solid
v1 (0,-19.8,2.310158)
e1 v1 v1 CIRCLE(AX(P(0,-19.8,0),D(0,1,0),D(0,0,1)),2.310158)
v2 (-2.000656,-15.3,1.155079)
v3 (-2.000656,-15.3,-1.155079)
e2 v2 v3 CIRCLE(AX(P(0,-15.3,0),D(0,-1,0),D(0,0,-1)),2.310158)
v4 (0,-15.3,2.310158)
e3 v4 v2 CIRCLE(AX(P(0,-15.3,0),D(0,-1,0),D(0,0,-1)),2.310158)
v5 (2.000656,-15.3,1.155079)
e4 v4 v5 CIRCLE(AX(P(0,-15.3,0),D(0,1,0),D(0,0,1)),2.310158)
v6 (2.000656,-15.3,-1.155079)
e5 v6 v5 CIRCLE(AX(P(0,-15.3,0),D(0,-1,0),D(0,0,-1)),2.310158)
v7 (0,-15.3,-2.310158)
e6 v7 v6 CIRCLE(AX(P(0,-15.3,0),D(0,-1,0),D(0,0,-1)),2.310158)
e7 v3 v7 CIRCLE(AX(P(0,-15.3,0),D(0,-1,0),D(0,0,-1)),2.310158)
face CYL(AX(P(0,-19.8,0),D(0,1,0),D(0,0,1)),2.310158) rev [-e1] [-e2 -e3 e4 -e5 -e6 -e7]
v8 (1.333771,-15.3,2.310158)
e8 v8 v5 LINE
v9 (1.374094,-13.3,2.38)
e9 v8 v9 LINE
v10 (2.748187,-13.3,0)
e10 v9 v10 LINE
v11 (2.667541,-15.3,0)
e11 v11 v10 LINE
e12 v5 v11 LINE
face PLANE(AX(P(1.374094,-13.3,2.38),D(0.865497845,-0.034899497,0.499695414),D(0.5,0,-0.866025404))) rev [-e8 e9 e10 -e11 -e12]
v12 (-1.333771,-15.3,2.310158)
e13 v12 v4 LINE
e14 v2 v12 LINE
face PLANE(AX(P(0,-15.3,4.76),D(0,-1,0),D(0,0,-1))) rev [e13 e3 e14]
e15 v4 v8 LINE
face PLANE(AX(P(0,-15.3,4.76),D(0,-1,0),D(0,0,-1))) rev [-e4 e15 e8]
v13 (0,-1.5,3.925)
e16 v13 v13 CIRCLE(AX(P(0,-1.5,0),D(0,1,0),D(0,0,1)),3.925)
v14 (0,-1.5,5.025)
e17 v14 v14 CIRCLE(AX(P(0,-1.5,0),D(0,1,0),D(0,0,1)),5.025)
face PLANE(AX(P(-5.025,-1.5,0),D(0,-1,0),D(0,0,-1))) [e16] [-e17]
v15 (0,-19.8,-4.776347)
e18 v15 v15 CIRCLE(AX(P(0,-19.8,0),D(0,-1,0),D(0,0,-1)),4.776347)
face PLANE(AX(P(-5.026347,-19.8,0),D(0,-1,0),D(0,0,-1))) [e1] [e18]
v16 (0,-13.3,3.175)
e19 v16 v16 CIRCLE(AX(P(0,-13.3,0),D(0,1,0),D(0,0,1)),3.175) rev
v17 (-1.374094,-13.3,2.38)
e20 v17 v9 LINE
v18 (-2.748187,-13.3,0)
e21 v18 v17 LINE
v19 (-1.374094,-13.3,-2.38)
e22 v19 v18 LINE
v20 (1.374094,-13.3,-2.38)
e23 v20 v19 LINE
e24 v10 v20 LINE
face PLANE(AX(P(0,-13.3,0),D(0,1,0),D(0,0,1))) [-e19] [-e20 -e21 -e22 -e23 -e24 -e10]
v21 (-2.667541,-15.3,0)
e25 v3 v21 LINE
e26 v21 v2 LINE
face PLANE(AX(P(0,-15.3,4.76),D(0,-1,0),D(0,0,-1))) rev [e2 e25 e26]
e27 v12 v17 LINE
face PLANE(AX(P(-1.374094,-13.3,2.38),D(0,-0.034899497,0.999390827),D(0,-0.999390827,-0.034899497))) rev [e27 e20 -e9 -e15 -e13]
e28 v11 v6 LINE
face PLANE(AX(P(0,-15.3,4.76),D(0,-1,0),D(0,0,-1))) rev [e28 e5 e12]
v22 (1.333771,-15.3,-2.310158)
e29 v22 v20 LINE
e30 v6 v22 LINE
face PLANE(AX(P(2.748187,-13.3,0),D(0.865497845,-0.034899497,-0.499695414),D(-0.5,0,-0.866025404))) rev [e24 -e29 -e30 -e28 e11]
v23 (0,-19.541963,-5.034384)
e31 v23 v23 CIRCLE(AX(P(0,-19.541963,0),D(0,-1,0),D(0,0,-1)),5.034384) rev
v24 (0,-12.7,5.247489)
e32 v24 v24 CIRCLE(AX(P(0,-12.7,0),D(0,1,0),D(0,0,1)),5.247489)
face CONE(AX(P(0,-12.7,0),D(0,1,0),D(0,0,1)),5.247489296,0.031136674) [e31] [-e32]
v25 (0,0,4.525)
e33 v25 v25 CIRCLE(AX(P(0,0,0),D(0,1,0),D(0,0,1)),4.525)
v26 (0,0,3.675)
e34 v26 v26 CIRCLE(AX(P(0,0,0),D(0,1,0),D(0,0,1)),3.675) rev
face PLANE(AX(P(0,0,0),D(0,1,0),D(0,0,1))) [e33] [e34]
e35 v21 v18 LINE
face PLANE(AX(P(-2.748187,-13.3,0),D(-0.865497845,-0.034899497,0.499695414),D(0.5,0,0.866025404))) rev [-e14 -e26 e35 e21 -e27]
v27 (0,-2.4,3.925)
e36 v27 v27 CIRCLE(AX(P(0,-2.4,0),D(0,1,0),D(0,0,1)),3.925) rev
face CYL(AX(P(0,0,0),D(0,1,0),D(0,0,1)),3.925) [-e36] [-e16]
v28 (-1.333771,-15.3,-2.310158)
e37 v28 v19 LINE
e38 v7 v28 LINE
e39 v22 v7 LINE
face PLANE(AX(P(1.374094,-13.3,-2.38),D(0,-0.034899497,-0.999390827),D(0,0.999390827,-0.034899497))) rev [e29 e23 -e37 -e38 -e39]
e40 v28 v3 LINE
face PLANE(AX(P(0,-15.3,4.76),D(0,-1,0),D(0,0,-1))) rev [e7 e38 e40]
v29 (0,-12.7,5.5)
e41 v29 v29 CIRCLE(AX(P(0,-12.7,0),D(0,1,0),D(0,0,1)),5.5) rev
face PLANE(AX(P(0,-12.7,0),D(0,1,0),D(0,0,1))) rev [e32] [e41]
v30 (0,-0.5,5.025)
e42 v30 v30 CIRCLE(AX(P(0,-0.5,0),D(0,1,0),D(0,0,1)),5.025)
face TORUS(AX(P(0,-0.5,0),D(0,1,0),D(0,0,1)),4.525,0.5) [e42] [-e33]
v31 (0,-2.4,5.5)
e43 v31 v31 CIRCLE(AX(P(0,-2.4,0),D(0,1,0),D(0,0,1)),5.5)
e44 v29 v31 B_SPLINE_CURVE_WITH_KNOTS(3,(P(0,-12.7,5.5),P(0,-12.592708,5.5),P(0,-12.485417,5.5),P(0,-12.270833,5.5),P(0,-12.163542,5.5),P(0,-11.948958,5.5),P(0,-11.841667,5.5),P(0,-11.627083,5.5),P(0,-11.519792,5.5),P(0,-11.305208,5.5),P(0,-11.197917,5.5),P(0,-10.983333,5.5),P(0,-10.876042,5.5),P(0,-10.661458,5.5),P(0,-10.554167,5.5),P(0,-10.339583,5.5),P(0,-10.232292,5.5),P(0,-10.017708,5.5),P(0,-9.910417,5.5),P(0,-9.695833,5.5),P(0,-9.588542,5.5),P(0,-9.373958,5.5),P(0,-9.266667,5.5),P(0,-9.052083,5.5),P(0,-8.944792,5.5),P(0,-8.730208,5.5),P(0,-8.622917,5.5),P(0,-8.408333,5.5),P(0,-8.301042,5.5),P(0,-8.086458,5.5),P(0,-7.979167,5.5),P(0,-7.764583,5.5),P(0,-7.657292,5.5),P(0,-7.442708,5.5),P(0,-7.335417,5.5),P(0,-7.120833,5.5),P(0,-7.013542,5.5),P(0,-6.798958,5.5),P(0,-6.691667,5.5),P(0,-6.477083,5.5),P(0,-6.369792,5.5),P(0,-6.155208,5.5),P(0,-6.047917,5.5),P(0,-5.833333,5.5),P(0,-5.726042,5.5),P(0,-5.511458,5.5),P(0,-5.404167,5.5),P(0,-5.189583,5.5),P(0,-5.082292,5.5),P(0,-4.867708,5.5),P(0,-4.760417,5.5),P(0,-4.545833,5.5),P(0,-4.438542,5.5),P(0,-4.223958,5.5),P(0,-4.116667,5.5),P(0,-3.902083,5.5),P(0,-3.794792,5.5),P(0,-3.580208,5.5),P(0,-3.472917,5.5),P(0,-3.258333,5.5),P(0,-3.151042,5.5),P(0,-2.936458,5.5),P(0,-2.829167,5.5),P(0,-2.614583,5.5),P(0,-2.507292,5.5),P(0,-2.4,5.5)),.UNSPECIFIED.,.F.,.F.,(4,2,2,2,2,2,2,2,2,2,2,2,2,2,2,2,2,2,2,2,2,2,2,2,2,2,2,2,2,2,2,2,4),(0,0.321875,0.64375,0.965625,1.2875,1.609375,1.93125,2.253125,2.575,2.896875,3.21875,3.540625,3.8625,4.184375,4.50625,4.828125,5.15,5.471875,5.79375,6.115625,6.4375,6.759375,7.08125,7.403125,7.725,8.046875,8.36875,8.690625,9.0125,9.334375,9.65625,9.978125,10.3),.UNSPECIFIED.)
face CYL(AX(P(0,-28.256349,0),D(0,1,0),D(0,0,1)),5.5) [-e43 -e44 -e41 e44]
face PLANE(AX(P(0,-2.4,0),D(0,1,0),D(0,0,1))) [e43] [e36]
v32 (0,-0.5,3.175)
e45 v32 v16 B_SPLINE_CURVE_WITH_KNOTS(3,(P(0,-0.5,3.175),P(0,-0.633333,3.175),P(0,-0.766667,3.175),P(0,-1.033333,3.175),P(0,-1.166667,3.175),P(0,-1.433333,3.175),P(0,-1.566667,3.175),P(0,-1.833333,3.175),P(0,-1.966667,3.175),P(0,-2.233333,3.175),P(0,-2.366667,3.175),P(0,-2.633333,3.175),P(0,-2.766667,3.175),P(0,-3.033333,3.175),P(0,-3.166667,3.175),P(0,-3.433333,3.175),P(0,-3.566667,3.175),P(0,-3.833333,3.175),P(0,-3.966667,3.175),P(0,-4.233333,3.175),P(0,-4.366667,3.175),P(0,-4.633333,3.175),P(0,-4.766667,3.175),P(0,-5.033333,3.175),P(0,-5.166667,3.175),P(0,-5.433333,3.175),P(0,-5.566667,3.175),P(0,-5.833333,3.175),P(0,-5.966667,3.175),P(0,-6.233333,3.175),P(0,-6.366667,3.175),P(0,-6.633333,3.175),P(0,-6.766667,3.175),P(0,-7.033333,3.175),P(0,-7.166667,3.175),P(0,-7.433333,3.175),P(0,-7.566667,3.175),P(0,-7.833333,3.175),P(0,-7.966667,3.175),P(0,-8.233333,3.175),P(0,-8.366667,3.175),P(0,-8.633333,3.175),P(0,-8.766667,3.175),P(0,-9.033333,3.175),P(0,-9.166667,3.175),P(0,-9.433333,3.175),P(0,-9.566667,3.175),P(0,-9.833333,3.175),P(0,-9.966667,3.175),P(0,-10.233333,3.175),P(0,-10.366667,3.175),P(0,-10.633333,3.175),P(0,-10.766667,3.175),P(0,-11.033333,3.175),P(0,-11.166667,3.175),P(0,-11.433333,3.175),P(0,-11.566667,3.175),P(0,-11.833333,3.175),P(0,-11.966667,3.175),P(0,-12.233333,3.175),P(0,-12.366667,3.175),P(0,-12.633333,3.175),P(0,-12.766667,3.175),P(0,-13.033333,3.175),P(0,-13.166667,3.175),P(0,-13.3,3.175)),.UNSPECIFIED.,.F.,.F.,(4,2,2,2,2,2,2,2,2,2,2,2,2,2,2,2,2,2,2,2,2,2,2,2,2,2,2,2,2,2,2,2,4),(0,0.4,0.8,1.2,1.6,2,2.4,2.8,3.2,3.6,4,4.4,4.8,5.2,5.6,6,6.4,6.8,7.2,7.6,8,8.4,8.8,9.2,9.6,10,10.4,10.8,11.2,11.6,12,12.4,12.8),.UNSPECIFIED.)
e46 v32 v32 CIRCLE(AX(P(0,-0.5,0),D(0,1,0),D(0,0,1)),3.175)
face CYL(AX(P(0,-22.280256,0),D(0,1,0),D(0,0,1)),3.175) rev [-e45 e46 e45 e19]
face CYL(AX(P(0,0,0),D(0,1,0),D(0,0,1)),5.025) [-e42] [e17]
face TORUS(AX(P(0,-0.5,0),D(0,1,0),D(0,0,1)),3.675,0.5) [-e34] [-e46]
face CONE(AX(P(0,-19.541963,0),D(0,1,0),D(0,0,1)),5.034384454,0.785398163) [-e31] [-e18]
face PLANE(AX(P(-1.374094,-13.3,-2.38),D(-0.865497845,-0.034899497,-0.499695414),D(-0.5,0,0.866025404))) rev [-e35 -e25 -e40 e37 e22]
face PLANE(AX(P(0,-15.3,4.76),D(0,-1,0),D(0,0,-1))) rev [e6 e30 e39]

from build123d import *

# Parameters (mm, degrees)
UBODY_SKETCH_R = 5.5
UBODY_DEPTH    = 10.3
TUBE_START     = -13.3
TUBE_SKETCH_R  = 3.175
TUBE_DEPTH     = 13.3
TUBE_RADIUS_R  = 0.5
HEX_2_DEPTH    = 2
HEX_2_DRAFT    = -2
PORT_SKETCH_R  = 2.310158461
PORT_DEPTH     = 18.163624326


with BuildPart() as part:
    # Release_Sketch → Release (revolve)
    with BuildSketch(Plane.XY, mode=Mode.PRIVATE) as release_sk:
        with BuildLine():
            Line((0, 0), (-4.525, 0))
            ThreePointArc((-4.525, 0), (-4.878553391, -0.146446609), (-5.025, -0.5))
            Line((-5.025, -0.5), (-5.025, -1.5))
            Line((-5.025, -1.5), (-3.925, -1.5))
            Line((-3.925, -1.5), (-3.925, -2.4))
            Line((-3.925, -2.4), (0, -2.4))
            Line((0, -2.4), (0, 0))
        make_face()
    revolve(release_sk.sketch.rotate(Axis((0, 0, 0), (0, -1, 0)), 270), axis=Axis((0, 0, 0), (0, -1, 0)))

    # UBody_Sketch → UBody (add)
    with BuildSketch(Plane(origin=(0, -2.4, 0), x_dir=(-1, 0, 0), z_dir=(0, 1, 0))):
        with Locations(Location((0, 0, 0), (0, 0, 90))):
            Circle(UBODY_SKETCH_R)
    extrude(amount=-UBODY_DEPTH)

    # Thread_Sketch → Thread (revolve)
    with BuildSketch(Plane.XY, mode=Mode.PRIVATE) as thread_sk:
        Polygon((-5.247489296, -12.7), (-5.026347442, -19.8), (0, -19.8), (0, -12.7), align=None)
    revolve(thread_sk.sketch.rotate(Axis((0, 0, 0), (0, -1, 0)), 270), axis=Axis((0, 0, 0), (0, -1, 0)))

    # Thread_Chamfer: read off the stored shape, not the designer's step
    # Thread_Chamfer outline → Thread_Chamfer (revolve, cut)
    with BuildSketch(Plane.XY):
        Polygon((5.034384454, -19.541962988), (4.776347442, -19.8), (5.034384454, -19.8), align=None)
    revolve(axis=Axis((0, 0, 0), (0, 1, 0)), mode=Mode.SUBTRACT)

    # Tube_Sketch → Tube (cut)
    with BuildSketch(Plane(origin=(0, 0, 0), x_dir=(1, 0, 0), z_dir=(0, 1, 0)).offset(TUBE_START)):
        with Locations(Location((0, 0, 0), (0, 0, 270))):
            Circle(TUBE_SKETCH_R)
    extrude(amount=TUBE_DEPTH, mode=Mode.SUBTRACT)

    # Tube_Radius
    tube_radius_edges = [part.edges().sort_by_distance(p)[0] for p in [
        (0, 0, -3.175),
    ]]
    fillet(tube_radius_edges, radius=TUBE_RADIUS_R)


with BuildPart() as hex_2_tool:
    # Hex_Sketch → Hex 2 (with draft: the straight prism first)
    with BuildSketch(Plane(origin=(0, -13.3, 0), x_dir=(-1, 0, 0), z_dir=(0, 1, 0))):
        Polygon((-2.748187281, 0), (-1.374093641, -2.38), (1.374093641, -2.38), (2.748187281, 0), (1.374093641, 2.38), (-1.374093641, 2.38), align=None)
    extrude(amount=-HEX_2_DEPTH)
    # Hex 2: the draft: its side faces are tilted about the plane it starts from
    hex_2_sides = [hex_2_tool.faces().sort_by_distance(p)[0] for p in [
        (2.061140461, -14.3, -1.19),
        (0, -14.3, -2.38),
        (-2.061140461, -14.3, -1.19),
        (-2.061140461, -14.3, 1.19),
        (0, -14.3, 2.38),
        (2.061140461, -14.3, 1.19),
    ]]
    draft(hex_2_sides, Plane(origin=(0, -13.3, 0), x_dir=(-1, 0, 0), z_dir=(0, 1, 0)), HEX_2_DRAFT)


with BuildPart() as part_1:
    add(part.part)

    # Hex 2: cut by hex_2_tool
    add(hex_2_tool.part, mode=Mode.SUBTRACT)

    # Port_Sketch → Port (cut, through all)
    with BuildSketch(Plane(origin=(0, -15.3, 0), x_dir=(-1, 0, 0), z_dir=(0, 1, 0))):
        with Locations(Location((0, 0, 0), (0, 0, 90))):
            Circle(PORT_SKETCH_R)
    extrude(amount=-PORT_DEPTH, mode=Mode.SUBTRACT)


solid = part_1.part
